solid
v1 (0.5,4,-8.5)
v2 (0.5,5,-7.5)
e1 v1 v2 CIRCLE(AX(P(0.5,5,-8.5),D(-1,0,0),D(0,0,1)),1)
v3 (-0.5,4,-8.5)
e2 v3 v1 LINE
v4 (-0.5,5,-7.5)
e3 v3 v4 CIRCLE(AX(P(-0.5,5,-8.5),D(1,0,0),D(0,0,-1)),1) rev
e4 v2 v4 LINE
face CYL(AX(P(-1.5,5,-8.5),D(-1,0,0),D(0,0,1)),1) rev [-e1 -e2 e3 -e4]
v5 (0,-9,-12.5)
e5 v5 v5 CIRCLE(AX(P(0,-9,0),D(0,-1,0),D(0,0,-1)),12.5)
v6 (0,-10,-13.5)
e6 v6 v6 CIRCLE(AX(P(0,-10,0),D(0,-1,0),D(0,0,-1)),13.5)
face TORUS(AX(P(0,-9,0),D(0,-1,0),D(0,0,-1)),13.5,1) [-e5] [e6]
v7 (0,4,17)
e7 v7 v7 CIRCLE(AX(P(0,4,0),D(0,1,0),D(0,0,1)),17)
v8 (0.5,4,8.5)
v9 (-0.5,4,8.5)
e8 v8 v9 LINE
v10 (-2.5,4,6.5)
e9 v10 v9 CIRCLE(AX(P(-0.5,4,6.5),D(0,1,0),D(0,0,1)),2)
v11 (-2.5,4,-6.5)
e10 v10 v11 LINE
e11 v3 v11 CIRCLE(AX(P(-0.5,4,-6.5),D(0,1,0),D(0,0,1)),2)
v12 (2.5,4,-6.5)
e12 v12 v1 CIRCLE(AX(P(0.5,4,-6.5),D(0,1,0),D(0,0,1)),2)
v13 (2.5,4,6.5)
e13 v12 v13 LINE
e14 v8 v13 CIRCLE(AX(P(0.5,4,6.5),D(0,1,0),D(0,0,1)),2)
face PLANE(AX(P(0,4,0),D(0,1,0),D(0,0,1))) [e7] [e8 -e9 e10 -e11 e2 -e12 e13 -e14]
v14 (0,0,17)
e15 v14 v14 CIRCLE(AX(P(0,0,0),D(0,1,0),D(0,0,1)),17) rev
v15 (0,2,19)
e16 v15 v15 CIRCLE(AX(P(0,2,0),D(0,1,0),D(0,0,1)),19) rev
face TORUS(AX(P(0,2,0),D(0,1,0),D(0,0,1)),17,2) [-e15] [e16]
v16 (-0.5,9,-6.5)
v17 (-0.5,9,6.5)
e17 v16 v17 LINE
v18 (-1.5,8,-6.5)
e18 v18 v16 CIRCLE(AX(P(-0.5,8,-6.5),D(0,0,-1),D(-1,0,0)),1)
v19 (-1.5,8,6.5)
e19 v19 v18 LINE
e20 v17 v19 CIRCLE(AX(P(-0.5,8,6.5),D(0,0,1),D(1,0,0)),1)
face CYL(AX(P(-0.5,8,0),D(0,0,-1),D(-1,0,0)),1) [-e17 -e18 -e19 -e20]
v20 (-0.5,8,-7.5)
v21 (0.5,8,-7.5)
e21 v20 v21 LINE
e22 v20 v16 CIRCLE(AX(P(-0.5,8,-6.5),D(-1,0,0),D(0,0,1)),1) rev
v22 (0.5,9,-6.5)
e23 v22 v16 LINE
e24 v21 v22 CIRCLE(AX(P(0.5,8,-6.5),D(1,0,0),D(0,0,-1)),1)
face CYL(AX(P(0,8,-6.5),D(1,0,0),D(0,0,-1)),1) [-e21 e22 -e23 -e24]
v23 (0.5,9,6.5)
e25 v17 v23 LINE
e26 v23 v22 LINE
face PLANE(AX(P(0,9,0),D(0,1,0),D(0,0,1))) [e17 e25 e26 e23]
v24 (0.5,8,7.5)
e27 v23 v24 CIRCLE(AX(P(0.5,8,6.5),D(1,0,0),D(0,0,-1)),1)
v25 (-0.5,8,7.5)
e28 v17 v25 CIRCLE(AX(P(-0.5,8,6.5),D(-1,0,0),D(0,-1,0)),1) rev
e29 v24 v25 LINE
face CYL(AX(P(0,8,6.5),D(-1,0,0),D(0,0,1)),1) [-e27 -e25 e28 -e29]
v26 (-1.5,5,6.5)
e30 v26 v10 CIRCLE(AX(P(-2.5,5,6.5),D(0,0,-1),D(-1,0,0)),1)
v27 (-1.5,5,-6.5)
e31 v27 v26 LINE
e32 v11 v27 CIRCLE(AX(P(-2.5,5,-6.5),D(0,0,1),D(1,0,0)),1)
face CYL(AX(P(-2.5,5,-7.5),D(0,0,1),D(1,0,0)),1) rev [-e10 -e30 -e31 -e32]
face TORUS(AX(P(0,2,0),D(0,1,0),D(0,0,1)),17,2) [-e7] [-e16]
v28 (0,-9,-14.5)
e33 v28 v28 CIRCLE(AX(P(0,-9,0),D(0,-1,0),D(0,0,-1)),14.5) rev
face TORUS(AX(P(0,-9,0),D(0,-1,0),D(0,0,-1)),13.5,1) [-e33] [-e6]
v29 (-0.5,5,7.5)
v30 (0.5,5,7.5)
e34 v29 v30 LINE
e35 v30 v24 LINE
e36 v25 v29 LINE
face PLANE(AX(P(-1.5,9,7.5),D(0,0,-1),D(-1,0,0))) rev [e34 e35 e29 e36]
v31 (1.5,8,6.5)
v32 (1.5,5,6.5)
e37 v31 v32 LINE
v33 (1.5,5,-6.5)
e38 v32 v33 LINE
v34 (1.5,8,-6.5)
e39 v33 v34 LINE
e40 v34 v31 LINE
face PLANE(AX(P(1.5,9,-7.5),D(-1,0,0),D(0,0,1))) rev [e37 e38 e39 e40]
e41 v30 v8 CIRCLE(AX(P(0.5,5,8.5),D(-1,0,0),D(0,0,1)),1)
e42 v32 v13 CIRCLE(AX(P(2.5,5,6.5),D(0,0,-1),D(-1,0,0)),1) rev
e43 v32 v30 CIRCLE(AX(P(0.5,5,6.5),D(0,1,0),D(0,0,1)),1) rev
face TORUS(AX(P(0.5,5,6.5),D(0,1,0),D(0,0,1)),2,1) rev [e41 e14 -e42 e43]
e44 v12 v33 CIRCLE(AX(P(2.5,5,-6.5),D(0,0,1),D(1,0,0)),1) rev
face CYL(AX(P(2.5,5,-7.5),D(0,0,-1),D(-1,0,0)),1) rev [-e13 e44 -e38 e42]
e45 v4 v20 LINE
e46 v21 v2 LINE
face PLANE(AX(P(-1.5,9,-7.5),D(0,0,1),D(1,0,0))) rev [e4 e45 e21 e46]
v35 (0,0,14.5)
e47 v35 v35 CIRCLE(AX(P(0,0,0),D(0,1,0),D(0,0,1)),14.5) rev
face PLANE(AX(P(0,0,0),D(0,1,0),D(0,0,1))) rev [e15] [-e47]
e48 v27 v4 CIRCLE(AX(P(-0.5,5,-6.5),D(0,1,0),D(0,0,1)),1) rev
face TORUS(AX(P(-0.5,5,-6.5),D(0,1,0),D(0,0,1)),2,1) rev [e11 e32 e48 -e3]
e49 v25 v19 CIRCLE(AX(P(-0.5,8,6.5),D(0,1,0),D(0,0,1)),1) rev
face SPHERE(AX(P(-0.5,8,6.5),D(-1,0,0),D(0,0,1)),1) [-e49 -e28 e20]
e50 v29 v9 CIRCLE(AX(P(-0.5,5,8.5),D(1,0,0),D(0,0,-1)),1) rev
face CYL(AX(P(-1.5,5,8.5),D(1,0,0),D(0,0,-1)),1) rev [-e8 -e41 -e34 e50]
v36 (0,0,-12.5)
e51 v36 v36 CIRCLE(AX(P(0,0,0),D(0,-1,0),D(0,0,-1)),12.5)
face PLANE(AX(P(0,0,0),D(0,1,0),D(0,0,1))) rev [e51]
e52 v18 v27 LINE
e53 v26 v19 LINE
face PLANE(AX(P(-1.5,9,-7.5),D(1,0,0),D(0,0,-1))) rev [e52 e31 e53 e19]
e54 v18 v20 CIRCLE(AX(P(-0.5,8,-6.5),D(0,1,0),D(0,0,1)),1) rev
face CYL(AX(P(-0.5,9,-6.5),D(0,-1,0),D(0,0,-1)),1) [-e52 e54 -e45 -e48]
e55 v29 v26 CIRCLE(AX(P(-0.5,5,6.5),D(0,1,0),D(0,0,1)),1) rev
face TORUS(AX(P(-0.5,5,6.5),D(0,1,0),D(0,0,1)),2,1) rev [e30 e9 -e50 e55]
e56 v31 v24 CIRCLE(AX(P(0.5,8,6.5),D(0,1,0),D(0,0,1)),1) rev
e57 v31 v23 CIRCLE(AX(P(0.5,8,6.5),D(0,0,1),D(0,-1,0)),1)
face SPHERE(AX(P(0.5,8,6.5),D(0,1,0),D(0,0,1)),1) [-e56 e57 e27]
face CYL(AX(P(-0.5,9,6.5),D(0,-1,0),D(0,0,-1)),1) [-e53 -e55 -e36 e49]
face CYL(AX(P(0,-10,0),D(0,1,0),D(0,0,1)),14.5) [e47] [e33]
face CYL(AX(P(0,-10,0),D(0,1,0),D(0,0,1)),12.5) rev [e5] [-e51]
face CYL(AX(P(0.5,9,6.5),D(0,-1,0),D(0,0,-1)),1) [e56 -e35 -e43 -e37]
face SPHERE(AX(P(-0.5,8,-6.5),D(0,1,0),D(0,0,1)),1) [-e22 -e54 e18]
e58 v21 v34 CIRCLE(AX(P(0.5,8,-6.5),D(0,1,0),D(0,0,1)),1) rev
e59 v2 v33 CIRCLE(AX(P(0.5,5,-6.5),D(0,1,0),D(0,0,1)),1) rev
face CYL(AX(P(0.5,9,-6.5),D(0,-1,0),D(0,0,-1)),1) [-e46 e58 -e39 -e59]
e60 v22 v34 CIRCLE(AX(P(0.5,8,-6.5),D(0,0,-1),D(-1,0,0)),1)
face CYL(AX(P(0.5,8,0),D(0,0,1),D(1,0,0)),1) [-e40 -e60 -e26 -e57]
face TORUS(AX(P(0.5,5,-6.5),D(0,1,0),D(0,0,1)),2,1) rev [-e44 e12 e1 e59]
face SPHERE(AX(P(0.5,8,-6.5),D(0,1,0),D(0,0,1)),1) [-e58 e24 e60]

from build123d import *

# Parameters (mm, degrees)
SKETCH_1_R      = 19
EXTRUDE_1_DEPTH = 4
SKETCH_2_W      = 3
SKETCH_2_H      = 15
EXTRUDE_2_DEPTH = 5
FILLET_1_R      = 1
FILLET_3_R      = 2
SKETCH_3_R      = 14.5
SKETCH_3_R_2    = 12.5
EXTRUDE_3_DEPTH = 10
FILLET_4_R      = 1


with BuildPart() as part:
    # 草圖1 → 填料-伸長1 (new body)
    with BuildSketch(Plane(origin=(0, 0, 0), x_dir=(1, 0, 0), z_dir=(0, 1, 0))):
        with Locations(Location((0, 0, 0), (0, 0, 270))):
            Circle(SKETCH_1_R)
    extrude(amount=EXTRUDE_1_DEPTH)

    # 草圖2 → 填料-伸長2 (add)
    with BuildSketch(Plane(origin=(0, 4, 0), x_dir=(1, 0, 0), z_dir=(0, 1, 0))):
        Rectangle(SKETCH_2_W, SKETCH_2_H)
    extrude(amount=EXTRUDE_2_DEPTH)

    # 圓角1
    fillet_1_edges = [part.edges().sort_by_distance(p)[0] for p in [
        (-1.5, 4, 0),
        (-1.5, 6.5, -7.5),
        (0, 4, 7.5),
        (-1.5, 6.5, 7.5),
        (1.5, 4, 0),
        (1.5, 6.5, 7.5),
        (0, 4, -7.5),
        (1.5, 6.5, -7.5),
        (-1.5, 9, 0),
        (0, 9, 7.5),
        (1.5, 9, 0),
        (0, 9, -7.5),
    ]]
    fillet(fillet_1_edges, radius=FILLET_1_R)

    # 圓角3
    fillet_3_edges = [part.edges().sort_by_distance(p)[0] for p in [
        (0, 0, -19),
        (0, 4, -19),
    ]]
    fillet(fillet_3_edges, radius=FILLET_3_R - 0.0001)  # a hair under: the kernel refuses the full size

    # 草圖3 → 填料-伸長3 (add)
    with BuildSketch(Plane.XZ):
        with Locations(Location((0, 0, 0), (0, 0, 90))):
            Circle(SKETCH_3_R)
        with Locations(Location((0, 0, 0), (0, 0, 270))):
            Circle(SKETCH_3_R_2, mode=Mode.SUBTRACT)
    extrude(amount=EXTRUDE_3_DEPTH)

    # 圓角4
    fillet_4_edges = [part.edges().sort_by_distance(p)[0] for p in [
        (0, -10, -14.5),
        (0, -10, 12.5),
    ]]
    fillet(fillet_4_edges, radius=FILLET_4_R - 0.0001)  # a hair under: the kernel refuses the full size


solid = part.part
